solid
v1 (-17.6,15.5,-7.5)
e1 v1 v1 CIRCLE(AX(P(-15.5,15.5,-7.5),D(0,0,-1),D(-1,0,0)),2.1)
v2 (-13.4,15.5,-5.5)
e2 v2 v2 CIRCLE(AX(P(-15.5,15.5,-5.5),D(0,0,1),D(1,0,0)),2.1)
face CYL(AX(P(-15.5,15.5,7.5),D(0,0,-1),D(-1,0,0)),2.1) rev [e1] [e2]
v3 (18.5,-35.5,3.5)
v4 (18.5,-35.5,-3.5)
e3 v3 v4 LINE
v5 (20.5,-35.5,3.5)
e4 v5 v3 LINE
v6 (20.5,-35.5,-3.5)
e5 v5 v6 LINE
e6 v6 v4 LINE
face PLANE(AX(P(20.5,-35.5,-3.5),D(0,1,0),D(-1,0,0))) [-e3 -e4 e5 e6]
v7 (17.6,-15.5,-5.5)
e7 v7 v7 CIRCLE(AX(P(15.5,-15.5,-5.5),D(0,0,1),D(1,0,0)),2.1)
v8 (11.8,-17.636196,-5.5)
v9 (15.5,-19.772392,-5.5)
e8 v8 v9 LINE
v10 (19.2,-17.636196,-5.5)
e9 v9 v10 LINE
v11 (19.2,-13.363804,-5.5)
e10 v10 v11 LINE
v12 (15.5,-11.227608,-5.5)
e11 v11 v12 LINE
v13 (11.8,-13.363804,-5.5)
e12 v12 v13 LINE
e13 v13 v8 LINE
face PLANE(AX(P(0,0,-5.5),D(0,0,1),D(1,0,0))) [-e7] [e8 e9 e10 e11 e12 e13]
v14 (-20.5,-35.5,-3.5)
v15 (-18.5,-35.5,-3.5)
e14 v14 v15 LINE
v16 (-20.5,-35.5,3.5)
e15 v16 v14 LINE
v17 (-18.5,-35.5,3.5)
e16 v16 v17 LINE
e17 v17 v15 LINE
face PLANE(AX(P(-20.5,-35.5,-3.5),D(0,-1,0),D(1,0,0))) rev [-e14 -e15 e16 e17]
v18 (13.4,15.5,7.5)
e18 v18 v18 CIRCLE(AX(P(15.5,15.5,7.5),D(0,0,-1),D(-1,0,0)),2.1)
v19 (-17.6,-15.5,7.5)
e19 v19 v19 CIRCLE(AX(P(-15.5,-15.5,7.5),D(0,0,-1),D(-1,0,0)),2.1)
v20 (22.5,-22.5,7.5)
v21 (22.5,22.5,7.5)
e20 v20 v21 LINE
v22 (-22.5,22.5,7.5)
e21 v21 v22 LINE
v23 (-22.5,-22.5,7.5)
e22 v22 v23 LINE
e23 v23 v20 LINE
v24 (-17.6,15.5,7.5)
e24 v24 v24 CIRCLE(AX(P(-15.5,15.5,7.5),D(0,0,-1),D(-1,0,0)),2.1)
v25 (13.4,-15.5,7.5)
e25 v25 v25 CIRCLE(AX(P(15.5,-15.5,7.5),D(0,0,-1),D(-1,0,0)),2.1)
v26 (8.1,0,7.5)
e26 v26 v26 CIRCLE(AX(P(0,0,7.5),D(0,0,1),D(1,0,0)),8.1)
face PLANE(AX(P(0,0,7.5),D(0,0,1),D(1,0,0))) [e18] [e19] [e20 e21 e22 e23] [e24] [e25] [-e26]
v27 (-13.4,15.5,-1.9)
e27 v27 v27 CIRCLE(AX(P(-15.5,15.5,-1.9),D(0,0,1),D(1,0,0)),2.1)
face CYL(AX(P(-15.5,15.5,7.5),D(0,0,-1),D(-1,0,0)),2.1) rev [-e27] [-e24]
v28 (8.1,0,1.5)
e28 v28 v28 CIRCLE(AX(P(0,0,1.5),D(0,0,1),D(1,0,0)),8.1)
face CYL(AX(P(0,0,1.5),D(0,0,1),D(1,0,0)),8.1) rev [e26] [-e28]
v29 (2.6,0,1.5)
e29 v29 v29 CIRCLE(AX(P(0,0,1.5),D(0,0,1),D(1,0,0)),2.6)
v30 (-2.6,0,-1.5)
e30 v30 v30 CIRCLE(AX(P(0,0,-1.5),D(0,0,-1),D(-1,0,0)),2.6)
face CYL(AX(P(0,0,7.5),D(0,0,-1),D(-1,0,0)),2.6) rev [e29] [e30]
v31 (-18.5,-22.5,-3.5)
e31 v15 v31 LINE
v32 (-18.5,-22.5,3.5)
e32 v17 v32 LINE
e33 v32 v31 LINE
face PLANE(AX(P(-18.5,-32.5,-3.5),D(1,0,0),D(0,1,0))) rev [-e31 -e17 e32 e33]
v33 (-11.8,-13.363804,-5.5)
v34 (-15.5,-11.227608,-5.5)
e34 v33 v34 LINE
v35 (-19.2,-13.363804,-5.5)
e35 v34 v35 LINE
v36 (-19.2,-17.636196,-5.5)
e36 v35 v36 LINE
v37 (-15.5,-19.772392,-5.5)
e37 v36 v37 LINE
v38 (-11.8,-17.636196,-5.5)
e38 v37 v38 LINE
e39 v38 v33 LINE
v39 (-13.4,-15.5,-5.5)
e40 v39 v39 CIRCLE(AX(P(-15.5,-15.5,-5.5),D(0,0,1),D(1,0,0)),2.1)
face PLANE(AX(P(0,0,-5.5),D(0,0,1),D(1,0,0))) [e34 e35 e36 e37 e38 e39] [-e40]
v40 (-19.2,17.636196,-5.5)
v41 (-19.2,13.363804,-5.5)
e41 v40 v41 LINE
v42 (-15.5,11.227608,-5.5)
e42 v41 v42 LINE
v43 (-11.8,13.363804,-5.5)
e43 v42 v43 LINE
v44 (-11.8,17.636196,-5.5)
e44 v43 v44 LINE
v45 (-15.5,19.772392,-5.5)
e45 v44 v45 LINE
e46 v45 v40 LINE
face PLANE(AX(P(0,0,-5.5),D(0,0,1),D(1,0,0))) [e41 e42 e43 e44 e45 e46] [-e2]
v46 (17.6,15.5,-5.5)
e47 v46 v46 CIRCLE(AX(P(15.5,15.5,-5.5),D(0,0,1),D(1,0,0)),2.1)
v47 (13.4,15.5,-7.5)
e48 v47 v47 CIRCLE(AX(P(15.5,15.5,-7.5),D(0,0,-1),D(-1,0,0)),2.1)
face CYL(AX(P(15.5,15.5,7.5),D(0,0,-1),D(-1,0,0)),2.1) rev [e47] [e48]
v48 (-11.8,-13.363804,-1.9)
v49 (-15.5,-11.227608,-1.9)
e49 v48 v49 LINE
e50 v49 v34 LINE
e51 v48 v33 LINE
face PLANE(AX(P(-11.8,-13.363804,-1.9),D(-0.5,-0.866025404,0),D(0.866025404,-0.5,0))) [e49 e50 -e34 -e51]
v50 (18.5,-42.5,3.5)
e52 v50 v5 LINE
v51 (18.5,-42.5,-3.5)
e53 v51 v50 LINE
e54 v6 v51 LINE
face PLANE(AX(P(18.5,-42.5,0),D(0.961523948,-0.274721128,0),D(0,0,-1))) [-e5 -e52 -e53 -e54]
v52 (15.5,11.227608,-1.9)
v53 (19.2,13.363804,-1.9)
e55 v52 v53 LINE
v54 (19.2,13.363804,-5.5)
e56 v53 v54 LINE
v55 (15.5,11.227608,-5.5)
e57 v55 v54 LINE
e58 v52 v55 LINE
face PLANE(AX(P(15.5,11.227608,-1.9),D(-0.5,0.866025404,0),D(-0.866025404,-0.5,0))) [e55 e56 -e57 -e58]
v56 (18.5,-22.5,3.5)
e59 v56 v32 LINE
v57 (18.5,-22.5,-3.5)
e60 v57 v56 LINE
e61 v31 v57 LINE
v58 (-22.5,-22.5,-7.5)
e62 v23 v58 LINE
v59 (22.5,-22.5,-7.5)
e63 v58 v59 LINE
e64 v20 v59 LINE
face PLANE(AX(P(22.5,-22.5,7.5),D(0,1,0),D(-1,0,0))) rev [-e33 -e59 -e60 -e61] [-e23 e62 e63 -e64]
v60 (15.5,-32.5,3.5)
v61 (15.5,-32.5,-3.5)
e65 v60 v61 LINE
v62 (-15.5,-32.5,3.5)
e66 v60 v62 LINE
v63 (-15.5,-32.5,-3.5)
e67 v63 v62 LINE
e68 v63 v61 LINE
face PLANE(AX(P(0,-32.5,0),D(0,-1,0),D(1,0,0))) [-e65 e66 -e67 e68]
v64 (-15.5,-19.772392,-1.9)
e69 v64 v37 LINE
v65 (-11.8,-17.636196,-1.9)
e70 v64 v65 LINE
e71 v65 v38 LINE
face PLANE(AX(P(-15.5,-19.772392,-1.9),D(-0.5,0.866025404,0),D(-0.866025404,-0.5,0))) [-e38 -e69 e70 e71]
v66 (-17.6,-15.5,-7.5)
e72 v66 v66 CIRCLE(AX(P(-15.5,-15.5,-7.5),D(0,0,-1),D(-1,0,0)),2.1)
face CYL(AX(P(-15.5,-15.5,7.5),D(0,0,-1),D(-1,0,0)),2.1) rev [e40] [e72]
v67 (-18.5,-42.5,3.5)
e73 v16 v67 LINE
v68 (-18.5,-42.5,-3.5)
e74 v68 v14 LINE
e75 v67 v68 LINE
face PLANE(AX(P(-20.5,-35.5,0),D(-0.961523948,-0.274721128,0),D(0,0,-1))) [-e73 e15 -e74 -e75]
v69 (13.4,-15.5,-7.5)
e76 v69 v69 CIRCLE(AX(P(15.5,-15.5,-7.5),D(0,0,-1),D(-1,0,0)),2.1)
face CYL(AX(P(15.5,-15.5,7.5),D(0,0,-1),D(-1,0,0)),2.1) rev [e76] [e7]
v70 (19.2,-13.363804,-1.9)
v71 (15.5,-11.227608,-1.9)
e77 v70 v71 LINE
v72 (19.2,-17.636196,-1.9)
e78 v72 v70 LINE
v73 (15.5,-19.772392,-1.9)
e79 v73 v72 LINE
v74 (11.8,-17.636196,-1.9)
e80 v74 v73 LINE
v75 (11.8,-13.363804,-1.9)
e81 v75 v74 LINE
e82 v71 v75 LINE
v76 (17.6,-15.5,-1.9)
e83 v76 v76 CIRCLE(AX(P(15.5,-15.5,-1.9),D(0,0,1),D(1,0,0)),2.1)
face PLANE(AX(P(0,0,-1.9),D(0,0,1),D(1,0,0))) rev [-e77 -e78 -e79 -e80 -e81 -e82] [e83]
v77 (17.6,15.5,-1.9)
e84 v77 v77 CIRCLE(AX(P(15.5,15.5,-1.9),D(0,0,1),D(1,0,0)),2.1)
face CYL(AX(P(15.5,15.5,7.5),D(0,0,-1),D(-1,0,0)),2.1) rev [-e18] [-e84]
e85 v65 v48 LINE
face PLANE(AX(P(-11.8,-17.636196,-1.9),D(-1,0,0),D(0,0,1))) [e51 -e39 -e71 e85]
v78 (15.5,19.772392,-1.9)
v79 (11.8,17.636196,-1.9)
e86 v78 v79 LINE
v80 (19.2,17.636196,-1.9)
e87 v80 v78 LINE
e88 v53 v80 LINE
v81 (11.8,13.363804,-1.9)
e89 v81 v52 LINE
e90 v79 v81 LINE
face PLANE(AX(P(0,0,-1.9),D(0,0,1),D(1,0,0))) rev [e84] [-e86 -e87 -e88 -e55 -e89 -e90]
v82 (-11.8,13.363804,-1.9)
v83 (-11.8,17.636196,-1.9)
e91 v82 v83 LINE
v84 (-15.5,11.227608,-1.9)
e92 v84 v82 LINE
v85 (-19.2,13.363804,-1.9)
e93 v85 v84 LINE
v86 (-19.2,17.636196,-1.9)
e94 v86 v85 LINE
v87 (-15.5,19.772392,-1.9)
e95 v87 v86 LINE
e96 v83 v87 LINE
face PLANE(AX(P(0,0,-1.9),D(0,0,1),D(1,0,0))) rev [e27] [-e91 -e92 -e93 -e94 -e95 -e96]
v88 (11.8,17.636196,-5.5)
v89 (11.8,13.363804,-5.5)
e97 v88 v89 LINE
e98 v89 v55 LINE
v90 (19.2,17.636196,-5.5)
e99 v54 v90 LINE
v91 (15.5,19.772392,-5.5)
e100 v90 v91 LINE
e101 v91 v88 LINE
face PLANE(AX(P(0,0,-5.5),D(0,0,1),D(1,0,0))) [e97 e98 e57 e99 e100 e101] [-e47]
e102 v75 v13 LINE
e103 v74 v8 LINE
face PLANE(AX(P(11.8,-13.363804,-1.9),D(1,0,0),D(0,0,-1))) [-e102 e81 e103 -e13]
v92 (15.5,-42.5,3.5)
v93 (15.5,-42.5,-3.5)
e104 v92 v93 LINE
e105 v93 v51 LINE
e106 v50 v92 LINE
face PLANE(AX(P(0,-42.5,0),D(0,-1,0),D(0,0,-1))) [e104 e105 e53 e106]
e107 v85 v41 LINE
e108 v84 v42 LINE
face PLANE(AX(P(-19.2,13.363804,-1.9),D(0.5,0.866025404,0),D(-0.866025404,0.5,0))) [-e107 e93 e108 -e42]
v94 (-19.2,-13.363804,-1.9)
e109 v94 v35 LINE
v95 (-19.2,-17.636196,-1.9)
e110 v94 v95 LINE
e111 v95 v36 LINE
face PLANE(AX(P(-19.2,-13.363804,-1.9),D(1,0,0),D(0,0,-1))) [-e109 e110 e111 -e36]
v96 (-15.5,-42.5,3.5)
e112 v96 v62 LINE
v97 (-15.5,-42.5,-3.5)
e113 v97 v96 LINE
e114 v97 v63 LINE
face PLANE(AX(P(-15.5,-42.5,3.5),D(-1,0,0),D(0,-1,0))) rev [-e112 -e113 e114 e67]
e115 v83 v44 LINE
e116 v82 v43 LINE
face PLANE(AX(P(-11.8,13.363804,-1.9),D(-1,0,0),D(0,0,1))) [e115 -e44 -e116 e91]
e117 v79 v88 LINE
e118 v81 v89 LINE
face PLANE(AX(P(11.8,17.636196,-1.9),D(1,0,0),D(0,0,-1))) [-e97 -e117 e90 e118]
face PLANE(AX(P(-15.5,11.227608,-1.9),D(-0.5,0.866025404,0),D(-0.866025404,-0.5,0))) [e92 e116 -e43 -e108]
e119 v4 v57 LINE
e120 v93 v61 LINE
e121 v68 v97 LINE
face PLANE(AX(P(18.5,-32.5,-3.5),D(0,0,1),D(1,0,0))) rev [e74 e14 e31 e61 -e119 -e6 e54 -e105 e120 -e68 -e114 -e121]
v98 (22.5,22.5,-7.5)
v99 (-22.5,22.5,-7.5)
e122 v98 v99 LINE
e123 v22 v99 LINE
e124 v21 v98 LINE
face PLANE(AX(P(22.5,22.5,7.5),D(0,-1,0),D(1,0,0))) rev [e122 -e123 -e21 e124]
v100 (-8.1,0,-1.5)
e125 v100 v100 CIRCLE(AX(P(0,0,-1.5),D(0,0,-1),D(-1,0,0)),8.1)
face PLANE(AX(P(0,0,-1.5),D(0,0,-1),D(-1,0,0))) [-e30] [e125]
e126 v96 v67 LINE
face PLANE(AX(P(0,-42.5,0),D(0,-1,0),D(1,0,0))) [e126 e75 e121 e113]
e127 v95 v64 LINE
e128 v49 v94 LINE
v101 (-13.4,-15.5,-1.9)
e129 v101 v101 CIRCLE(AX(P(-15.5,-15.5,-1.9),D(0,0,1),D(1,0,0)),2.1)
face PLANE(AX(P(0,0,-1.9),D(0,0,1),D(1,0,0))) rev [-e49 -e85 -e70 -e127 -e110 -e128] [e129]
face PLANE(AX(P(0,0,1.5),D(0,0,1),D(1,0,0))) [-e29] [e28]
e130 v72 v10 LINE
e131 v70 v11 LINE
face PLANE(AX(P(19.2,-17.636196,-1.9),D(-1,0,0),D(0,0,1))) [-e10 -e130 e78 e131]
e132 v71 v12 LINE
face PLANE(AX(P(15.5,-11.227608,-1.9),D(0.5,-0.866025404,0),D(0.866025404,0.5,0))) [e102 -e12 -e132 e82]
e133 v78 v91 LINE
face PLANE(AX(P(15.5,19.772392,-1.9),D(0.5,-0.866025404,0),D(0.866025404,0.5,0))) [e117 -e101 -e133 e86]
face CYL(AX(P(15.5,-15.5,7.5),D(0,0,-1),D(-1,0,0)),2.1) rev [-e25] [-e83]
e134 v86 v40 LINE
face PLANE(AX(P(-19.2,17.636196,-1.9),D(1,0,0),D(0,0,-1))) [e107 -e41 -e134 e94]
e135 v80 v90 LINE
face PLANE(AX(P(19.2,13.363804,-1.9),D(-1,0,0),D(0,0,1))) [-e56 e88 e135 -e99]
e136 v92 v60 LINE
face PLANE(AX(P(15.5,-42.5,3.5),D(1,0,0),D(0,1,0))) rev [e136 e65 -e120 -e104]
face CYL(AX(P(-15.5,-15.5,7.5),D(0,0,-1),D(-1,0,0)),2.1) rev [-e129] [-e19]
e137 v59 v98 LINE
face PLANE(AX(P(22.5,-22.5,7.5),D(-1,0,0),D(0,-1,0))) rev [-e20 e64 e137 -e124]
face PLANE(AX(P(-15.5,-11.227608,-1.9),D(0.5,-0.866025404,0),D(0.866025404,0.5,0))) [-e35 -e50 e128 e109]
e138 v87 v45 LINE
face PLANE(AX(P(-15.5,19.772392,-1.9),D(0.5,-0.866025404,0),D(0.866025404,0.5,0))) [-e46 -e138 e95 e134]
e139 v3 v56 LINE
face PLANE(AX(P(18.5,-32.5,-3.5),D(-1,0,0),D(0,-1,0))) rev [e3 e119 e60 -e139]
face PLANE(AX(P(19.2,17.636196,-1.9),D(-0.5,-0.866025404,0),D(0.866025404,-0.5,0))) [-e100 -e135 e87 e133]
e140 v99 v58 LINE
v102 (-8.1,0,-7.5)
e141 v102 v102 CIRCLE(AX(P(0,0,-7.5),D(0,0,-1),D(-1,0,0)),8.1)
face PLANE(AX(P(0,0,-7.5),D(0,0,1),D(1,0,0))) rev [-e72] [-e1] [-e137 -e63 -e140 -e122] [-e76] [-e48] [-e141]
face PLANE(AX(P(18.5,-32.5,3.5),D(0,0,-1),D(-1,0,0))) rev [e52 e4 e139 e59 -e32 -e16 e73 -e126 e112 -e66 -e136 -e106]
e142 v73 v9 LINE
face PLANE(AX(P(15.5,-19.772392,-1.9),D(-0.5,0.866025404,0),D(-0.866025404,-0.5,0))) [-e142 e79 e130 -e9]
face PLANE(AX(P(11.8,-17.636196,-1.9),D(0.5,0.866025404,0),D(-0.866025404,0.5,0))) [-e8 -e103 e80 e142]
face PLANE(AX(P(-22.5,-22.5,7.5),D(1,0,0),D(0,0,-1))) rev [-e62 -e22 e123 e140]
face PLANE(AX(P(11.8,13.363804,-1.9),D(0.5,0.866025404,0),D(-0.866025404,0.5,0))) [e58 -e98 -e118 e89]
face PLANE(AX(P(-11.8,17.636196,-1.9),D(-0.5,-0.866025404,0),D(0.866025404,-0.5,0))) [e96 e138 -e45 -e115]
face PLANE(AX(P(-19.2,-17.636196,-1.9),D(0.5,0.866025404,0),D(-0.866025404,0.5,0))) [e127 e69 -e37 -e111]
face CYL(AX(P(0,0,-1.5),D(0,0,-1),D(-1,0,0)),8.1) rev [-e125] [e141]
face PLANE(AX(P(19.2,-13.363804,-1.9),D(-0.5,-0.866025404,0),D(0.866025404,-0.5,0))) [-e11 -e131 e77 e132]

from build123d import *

# Parameters (mm, degrees)
SKETCH1_W           = 45
SKETCH1_H           = 45
SKETCH1_R           = 2.6
BOSS_EXTRUDE1_DEPTH = 7.5
SKETCH2_R           = 8.1
CUT_EXTRUDE1_DEPTH  = 6
CUT_EXTRUDE4_START  = -6
SKETCH5_R           = 8.1
CUT_EXTRUDE4_DEPTH  = 6
SKETCH7_W           = 37
SKETCH7_H           = 7
BOSS_EXTRUDE2_DEPTH = 10
CUT_EXTRUDE6_START  = 2
CUT_EXTRUDE6_DEPTH  = 3.6
SKETCH8_R           = 2.1
CUT_EXTRUDE7_DEPTH  = 43.278836313
SKETCH9_W           = 3
SKETCH9_H           = 7
BOSS_EXTRUDE3_DEPTH = 10
SKETCH10_W          = 7
SKETCH10_H          = 7
BOSS_EXTRUDE4_DEPTH = 2
CHAMFER2_SIZE2      = 7
CHAMFER2_SIZE       = 2
CHAMFER3_SIZE2      = 7
CHAMFER3_SIZE       = 2


with BuildPart() as part:
    # Sketch1 → Boss-Extrude1 (new, symmetric)
    with BuildSketch(Plane.XY):
        Rectangle(SKETCH1_W, SKETCH1_H)
        Circle(SKETCH1_R, mode=Mode.SUBTRACT)
    extrude(amount=BOSS_EXTRUDE1_DEPTH, both=True)

    # Sketch2 → Cut-Extrude1 (cut)
    with BuildSketch(Plane.XY.offset(7.5)):
        Circle(SKETCH2_R)
    extrude(amount=-CUT_EXTRUDE1_DEPTH, mode=Mode.SUBTRACT)

    # Sketch5 → Cut-Extrude4 (cut)
    with BuildSketch(Plane(origin=(0, 0, -7.5), x_dir=(-1, 0, 0), z_dir=(0, 0, -1)).offset(CUT_EXTRUDE4_START)):
        with Locations(Location((0, 0, 0), (0, 0, 180))):
            Circle(SKETCH5_R)
    extrude(amount=CUT_EXTRUDE4_DEPTH, mode=Mode.SUBTRACT)

    # Sketch7 → Boss-Extrude2 (add)
    with BuildSketch(Plane.XZ.offset(22.5)):
        Rectangle(SKETCH7_W, SKETCH7_H)
    extrude(amount=BOSS_EXTRUDE2_DEPTH)

    # Sketch6 → Cut-Extrude6 (cut)
    with BuildSketch(Plane.XY.offset(-7.5).offset(CUT_EXTRUDE6_START)):
        Polygon((19.2, 17.636195996), (15.5, 19.772391992), (11.8, 17.636195996), (11.8, 13.363804004), (15.5, 11.227608008), (19.2, 13.363804004), align=None)
        Polygon((-11.8, 17.636195996), (-15.5, 19.772391992), (-19.2, 17.636195996), (-19.2, 13.363804004), (-15.5, 11.227608008), (-11.8, 13.363804004), align=None)
        Polygon((19.2, -13.363804004), (15.5, -11.227608008), (11.8, -13.363804004), (11.8, -17.636195996), (15.5, -19.772391992), (19.2, -17.636195996), align=None)
        Polygon((-11.8, -13.363804004), (-15.5, -11.227608008), (-19.2, -13.363804004), (-19.2, -17.636195996), (-15.5, -19.772391992), (-11.8, -17.636195996), align=None)
    extrude(amount=CUT_EXTRUDE6_DEPTH, mode=Mode.SUBTRACT)

    # Sketch8 → Cut-Extrude7 (cut, through all)
    with BuildSketch(Plane(origin=(0, 0, -7.5), x_dir=(-1, 0, 0), z_dir=(0, 0, -1))):
        with Locations((-15.5, 15.5)):
            Circle(SKETCH8_R)
        with Locations((15.5, 15.5)):
            Circle(SKETCH8_R)
        with Locations((15.5, -15.5)):
            Circle(SKETCH8_R)
        with Locations((-15.5, -15.5)):
            Circle(SKETCH8_R)
    extrude(amount=-CUT_EXTRUDE7_DEPTH, mode=Mode.SUBTRACT)

    # Sketch9 → Boss-Extrude3 (add)
    with BuildSketch(Plane.XZ.offset(32.5)):
        with Locations((-17, 0)):
            Rectangle(SKETCH9_W, SKETCH9_H)
        with Locations((17, 0)):
            Rectangle(SKETCH9_W, SKETCH9_H)
    extrude(amount=BOSS_EXTRUDE3_DEPTH)

    # Sketch10 → Boss-Extrude4 (add)
    with BuildSketch(Plane.ZY.offset(18.5)):
        with Locations((0, -39)):
            Rectangle(SKETCH10_W, SKETCH10_H)
    boss_extrude4 = extrude(amount=BOSS_EXTRUDE4_DEPTH)

    # Mirror1: Boss-Extrude4 across plane
    add(boss_extrude4.mirror(Plane(origin=(0, 0, 0), x_dir=(0, 0, 1), z_dir=(1, 0, 0))))

    # Chamfer2
    chamfer2_edges = [part.edges().sort_by_distance(p)[0] for p in [
        (-20.5, -42.5, 0),
    ]]
    chamfer2_side = [part.faces().sort_by_distance(p)[0] for p in [
        (-20.46, -42.5, 0),
    ]]
    chamfer(chamfer2_edges, length=CHAMFER2_SIZE - 0.0001, length2=CHAMFER2_SIZE2 - 0.0001, reference=chamfer2_side[0])  # a hair under: the kernel refuses the full size

    # Chamfer3
    chamfer3_edges = [part.edges().sort_by_distance(p)[0] for p in [
        (20.5, -42.5, 0),
    ]]
    chamfer3_side = [part.faces().sort_by_distance(p)[0] for p in [
        (20.46, -42.5, 0),
    ]]
    chamfer(chamfer3_edges, length=CHAMFER3_SIZE - 0.0001, length2=CHAMFER3_SIZE2 - 0.0001, reference=chamfer3_side[0])  # a hair under: the kernel refuses the full size


solid = part.part
